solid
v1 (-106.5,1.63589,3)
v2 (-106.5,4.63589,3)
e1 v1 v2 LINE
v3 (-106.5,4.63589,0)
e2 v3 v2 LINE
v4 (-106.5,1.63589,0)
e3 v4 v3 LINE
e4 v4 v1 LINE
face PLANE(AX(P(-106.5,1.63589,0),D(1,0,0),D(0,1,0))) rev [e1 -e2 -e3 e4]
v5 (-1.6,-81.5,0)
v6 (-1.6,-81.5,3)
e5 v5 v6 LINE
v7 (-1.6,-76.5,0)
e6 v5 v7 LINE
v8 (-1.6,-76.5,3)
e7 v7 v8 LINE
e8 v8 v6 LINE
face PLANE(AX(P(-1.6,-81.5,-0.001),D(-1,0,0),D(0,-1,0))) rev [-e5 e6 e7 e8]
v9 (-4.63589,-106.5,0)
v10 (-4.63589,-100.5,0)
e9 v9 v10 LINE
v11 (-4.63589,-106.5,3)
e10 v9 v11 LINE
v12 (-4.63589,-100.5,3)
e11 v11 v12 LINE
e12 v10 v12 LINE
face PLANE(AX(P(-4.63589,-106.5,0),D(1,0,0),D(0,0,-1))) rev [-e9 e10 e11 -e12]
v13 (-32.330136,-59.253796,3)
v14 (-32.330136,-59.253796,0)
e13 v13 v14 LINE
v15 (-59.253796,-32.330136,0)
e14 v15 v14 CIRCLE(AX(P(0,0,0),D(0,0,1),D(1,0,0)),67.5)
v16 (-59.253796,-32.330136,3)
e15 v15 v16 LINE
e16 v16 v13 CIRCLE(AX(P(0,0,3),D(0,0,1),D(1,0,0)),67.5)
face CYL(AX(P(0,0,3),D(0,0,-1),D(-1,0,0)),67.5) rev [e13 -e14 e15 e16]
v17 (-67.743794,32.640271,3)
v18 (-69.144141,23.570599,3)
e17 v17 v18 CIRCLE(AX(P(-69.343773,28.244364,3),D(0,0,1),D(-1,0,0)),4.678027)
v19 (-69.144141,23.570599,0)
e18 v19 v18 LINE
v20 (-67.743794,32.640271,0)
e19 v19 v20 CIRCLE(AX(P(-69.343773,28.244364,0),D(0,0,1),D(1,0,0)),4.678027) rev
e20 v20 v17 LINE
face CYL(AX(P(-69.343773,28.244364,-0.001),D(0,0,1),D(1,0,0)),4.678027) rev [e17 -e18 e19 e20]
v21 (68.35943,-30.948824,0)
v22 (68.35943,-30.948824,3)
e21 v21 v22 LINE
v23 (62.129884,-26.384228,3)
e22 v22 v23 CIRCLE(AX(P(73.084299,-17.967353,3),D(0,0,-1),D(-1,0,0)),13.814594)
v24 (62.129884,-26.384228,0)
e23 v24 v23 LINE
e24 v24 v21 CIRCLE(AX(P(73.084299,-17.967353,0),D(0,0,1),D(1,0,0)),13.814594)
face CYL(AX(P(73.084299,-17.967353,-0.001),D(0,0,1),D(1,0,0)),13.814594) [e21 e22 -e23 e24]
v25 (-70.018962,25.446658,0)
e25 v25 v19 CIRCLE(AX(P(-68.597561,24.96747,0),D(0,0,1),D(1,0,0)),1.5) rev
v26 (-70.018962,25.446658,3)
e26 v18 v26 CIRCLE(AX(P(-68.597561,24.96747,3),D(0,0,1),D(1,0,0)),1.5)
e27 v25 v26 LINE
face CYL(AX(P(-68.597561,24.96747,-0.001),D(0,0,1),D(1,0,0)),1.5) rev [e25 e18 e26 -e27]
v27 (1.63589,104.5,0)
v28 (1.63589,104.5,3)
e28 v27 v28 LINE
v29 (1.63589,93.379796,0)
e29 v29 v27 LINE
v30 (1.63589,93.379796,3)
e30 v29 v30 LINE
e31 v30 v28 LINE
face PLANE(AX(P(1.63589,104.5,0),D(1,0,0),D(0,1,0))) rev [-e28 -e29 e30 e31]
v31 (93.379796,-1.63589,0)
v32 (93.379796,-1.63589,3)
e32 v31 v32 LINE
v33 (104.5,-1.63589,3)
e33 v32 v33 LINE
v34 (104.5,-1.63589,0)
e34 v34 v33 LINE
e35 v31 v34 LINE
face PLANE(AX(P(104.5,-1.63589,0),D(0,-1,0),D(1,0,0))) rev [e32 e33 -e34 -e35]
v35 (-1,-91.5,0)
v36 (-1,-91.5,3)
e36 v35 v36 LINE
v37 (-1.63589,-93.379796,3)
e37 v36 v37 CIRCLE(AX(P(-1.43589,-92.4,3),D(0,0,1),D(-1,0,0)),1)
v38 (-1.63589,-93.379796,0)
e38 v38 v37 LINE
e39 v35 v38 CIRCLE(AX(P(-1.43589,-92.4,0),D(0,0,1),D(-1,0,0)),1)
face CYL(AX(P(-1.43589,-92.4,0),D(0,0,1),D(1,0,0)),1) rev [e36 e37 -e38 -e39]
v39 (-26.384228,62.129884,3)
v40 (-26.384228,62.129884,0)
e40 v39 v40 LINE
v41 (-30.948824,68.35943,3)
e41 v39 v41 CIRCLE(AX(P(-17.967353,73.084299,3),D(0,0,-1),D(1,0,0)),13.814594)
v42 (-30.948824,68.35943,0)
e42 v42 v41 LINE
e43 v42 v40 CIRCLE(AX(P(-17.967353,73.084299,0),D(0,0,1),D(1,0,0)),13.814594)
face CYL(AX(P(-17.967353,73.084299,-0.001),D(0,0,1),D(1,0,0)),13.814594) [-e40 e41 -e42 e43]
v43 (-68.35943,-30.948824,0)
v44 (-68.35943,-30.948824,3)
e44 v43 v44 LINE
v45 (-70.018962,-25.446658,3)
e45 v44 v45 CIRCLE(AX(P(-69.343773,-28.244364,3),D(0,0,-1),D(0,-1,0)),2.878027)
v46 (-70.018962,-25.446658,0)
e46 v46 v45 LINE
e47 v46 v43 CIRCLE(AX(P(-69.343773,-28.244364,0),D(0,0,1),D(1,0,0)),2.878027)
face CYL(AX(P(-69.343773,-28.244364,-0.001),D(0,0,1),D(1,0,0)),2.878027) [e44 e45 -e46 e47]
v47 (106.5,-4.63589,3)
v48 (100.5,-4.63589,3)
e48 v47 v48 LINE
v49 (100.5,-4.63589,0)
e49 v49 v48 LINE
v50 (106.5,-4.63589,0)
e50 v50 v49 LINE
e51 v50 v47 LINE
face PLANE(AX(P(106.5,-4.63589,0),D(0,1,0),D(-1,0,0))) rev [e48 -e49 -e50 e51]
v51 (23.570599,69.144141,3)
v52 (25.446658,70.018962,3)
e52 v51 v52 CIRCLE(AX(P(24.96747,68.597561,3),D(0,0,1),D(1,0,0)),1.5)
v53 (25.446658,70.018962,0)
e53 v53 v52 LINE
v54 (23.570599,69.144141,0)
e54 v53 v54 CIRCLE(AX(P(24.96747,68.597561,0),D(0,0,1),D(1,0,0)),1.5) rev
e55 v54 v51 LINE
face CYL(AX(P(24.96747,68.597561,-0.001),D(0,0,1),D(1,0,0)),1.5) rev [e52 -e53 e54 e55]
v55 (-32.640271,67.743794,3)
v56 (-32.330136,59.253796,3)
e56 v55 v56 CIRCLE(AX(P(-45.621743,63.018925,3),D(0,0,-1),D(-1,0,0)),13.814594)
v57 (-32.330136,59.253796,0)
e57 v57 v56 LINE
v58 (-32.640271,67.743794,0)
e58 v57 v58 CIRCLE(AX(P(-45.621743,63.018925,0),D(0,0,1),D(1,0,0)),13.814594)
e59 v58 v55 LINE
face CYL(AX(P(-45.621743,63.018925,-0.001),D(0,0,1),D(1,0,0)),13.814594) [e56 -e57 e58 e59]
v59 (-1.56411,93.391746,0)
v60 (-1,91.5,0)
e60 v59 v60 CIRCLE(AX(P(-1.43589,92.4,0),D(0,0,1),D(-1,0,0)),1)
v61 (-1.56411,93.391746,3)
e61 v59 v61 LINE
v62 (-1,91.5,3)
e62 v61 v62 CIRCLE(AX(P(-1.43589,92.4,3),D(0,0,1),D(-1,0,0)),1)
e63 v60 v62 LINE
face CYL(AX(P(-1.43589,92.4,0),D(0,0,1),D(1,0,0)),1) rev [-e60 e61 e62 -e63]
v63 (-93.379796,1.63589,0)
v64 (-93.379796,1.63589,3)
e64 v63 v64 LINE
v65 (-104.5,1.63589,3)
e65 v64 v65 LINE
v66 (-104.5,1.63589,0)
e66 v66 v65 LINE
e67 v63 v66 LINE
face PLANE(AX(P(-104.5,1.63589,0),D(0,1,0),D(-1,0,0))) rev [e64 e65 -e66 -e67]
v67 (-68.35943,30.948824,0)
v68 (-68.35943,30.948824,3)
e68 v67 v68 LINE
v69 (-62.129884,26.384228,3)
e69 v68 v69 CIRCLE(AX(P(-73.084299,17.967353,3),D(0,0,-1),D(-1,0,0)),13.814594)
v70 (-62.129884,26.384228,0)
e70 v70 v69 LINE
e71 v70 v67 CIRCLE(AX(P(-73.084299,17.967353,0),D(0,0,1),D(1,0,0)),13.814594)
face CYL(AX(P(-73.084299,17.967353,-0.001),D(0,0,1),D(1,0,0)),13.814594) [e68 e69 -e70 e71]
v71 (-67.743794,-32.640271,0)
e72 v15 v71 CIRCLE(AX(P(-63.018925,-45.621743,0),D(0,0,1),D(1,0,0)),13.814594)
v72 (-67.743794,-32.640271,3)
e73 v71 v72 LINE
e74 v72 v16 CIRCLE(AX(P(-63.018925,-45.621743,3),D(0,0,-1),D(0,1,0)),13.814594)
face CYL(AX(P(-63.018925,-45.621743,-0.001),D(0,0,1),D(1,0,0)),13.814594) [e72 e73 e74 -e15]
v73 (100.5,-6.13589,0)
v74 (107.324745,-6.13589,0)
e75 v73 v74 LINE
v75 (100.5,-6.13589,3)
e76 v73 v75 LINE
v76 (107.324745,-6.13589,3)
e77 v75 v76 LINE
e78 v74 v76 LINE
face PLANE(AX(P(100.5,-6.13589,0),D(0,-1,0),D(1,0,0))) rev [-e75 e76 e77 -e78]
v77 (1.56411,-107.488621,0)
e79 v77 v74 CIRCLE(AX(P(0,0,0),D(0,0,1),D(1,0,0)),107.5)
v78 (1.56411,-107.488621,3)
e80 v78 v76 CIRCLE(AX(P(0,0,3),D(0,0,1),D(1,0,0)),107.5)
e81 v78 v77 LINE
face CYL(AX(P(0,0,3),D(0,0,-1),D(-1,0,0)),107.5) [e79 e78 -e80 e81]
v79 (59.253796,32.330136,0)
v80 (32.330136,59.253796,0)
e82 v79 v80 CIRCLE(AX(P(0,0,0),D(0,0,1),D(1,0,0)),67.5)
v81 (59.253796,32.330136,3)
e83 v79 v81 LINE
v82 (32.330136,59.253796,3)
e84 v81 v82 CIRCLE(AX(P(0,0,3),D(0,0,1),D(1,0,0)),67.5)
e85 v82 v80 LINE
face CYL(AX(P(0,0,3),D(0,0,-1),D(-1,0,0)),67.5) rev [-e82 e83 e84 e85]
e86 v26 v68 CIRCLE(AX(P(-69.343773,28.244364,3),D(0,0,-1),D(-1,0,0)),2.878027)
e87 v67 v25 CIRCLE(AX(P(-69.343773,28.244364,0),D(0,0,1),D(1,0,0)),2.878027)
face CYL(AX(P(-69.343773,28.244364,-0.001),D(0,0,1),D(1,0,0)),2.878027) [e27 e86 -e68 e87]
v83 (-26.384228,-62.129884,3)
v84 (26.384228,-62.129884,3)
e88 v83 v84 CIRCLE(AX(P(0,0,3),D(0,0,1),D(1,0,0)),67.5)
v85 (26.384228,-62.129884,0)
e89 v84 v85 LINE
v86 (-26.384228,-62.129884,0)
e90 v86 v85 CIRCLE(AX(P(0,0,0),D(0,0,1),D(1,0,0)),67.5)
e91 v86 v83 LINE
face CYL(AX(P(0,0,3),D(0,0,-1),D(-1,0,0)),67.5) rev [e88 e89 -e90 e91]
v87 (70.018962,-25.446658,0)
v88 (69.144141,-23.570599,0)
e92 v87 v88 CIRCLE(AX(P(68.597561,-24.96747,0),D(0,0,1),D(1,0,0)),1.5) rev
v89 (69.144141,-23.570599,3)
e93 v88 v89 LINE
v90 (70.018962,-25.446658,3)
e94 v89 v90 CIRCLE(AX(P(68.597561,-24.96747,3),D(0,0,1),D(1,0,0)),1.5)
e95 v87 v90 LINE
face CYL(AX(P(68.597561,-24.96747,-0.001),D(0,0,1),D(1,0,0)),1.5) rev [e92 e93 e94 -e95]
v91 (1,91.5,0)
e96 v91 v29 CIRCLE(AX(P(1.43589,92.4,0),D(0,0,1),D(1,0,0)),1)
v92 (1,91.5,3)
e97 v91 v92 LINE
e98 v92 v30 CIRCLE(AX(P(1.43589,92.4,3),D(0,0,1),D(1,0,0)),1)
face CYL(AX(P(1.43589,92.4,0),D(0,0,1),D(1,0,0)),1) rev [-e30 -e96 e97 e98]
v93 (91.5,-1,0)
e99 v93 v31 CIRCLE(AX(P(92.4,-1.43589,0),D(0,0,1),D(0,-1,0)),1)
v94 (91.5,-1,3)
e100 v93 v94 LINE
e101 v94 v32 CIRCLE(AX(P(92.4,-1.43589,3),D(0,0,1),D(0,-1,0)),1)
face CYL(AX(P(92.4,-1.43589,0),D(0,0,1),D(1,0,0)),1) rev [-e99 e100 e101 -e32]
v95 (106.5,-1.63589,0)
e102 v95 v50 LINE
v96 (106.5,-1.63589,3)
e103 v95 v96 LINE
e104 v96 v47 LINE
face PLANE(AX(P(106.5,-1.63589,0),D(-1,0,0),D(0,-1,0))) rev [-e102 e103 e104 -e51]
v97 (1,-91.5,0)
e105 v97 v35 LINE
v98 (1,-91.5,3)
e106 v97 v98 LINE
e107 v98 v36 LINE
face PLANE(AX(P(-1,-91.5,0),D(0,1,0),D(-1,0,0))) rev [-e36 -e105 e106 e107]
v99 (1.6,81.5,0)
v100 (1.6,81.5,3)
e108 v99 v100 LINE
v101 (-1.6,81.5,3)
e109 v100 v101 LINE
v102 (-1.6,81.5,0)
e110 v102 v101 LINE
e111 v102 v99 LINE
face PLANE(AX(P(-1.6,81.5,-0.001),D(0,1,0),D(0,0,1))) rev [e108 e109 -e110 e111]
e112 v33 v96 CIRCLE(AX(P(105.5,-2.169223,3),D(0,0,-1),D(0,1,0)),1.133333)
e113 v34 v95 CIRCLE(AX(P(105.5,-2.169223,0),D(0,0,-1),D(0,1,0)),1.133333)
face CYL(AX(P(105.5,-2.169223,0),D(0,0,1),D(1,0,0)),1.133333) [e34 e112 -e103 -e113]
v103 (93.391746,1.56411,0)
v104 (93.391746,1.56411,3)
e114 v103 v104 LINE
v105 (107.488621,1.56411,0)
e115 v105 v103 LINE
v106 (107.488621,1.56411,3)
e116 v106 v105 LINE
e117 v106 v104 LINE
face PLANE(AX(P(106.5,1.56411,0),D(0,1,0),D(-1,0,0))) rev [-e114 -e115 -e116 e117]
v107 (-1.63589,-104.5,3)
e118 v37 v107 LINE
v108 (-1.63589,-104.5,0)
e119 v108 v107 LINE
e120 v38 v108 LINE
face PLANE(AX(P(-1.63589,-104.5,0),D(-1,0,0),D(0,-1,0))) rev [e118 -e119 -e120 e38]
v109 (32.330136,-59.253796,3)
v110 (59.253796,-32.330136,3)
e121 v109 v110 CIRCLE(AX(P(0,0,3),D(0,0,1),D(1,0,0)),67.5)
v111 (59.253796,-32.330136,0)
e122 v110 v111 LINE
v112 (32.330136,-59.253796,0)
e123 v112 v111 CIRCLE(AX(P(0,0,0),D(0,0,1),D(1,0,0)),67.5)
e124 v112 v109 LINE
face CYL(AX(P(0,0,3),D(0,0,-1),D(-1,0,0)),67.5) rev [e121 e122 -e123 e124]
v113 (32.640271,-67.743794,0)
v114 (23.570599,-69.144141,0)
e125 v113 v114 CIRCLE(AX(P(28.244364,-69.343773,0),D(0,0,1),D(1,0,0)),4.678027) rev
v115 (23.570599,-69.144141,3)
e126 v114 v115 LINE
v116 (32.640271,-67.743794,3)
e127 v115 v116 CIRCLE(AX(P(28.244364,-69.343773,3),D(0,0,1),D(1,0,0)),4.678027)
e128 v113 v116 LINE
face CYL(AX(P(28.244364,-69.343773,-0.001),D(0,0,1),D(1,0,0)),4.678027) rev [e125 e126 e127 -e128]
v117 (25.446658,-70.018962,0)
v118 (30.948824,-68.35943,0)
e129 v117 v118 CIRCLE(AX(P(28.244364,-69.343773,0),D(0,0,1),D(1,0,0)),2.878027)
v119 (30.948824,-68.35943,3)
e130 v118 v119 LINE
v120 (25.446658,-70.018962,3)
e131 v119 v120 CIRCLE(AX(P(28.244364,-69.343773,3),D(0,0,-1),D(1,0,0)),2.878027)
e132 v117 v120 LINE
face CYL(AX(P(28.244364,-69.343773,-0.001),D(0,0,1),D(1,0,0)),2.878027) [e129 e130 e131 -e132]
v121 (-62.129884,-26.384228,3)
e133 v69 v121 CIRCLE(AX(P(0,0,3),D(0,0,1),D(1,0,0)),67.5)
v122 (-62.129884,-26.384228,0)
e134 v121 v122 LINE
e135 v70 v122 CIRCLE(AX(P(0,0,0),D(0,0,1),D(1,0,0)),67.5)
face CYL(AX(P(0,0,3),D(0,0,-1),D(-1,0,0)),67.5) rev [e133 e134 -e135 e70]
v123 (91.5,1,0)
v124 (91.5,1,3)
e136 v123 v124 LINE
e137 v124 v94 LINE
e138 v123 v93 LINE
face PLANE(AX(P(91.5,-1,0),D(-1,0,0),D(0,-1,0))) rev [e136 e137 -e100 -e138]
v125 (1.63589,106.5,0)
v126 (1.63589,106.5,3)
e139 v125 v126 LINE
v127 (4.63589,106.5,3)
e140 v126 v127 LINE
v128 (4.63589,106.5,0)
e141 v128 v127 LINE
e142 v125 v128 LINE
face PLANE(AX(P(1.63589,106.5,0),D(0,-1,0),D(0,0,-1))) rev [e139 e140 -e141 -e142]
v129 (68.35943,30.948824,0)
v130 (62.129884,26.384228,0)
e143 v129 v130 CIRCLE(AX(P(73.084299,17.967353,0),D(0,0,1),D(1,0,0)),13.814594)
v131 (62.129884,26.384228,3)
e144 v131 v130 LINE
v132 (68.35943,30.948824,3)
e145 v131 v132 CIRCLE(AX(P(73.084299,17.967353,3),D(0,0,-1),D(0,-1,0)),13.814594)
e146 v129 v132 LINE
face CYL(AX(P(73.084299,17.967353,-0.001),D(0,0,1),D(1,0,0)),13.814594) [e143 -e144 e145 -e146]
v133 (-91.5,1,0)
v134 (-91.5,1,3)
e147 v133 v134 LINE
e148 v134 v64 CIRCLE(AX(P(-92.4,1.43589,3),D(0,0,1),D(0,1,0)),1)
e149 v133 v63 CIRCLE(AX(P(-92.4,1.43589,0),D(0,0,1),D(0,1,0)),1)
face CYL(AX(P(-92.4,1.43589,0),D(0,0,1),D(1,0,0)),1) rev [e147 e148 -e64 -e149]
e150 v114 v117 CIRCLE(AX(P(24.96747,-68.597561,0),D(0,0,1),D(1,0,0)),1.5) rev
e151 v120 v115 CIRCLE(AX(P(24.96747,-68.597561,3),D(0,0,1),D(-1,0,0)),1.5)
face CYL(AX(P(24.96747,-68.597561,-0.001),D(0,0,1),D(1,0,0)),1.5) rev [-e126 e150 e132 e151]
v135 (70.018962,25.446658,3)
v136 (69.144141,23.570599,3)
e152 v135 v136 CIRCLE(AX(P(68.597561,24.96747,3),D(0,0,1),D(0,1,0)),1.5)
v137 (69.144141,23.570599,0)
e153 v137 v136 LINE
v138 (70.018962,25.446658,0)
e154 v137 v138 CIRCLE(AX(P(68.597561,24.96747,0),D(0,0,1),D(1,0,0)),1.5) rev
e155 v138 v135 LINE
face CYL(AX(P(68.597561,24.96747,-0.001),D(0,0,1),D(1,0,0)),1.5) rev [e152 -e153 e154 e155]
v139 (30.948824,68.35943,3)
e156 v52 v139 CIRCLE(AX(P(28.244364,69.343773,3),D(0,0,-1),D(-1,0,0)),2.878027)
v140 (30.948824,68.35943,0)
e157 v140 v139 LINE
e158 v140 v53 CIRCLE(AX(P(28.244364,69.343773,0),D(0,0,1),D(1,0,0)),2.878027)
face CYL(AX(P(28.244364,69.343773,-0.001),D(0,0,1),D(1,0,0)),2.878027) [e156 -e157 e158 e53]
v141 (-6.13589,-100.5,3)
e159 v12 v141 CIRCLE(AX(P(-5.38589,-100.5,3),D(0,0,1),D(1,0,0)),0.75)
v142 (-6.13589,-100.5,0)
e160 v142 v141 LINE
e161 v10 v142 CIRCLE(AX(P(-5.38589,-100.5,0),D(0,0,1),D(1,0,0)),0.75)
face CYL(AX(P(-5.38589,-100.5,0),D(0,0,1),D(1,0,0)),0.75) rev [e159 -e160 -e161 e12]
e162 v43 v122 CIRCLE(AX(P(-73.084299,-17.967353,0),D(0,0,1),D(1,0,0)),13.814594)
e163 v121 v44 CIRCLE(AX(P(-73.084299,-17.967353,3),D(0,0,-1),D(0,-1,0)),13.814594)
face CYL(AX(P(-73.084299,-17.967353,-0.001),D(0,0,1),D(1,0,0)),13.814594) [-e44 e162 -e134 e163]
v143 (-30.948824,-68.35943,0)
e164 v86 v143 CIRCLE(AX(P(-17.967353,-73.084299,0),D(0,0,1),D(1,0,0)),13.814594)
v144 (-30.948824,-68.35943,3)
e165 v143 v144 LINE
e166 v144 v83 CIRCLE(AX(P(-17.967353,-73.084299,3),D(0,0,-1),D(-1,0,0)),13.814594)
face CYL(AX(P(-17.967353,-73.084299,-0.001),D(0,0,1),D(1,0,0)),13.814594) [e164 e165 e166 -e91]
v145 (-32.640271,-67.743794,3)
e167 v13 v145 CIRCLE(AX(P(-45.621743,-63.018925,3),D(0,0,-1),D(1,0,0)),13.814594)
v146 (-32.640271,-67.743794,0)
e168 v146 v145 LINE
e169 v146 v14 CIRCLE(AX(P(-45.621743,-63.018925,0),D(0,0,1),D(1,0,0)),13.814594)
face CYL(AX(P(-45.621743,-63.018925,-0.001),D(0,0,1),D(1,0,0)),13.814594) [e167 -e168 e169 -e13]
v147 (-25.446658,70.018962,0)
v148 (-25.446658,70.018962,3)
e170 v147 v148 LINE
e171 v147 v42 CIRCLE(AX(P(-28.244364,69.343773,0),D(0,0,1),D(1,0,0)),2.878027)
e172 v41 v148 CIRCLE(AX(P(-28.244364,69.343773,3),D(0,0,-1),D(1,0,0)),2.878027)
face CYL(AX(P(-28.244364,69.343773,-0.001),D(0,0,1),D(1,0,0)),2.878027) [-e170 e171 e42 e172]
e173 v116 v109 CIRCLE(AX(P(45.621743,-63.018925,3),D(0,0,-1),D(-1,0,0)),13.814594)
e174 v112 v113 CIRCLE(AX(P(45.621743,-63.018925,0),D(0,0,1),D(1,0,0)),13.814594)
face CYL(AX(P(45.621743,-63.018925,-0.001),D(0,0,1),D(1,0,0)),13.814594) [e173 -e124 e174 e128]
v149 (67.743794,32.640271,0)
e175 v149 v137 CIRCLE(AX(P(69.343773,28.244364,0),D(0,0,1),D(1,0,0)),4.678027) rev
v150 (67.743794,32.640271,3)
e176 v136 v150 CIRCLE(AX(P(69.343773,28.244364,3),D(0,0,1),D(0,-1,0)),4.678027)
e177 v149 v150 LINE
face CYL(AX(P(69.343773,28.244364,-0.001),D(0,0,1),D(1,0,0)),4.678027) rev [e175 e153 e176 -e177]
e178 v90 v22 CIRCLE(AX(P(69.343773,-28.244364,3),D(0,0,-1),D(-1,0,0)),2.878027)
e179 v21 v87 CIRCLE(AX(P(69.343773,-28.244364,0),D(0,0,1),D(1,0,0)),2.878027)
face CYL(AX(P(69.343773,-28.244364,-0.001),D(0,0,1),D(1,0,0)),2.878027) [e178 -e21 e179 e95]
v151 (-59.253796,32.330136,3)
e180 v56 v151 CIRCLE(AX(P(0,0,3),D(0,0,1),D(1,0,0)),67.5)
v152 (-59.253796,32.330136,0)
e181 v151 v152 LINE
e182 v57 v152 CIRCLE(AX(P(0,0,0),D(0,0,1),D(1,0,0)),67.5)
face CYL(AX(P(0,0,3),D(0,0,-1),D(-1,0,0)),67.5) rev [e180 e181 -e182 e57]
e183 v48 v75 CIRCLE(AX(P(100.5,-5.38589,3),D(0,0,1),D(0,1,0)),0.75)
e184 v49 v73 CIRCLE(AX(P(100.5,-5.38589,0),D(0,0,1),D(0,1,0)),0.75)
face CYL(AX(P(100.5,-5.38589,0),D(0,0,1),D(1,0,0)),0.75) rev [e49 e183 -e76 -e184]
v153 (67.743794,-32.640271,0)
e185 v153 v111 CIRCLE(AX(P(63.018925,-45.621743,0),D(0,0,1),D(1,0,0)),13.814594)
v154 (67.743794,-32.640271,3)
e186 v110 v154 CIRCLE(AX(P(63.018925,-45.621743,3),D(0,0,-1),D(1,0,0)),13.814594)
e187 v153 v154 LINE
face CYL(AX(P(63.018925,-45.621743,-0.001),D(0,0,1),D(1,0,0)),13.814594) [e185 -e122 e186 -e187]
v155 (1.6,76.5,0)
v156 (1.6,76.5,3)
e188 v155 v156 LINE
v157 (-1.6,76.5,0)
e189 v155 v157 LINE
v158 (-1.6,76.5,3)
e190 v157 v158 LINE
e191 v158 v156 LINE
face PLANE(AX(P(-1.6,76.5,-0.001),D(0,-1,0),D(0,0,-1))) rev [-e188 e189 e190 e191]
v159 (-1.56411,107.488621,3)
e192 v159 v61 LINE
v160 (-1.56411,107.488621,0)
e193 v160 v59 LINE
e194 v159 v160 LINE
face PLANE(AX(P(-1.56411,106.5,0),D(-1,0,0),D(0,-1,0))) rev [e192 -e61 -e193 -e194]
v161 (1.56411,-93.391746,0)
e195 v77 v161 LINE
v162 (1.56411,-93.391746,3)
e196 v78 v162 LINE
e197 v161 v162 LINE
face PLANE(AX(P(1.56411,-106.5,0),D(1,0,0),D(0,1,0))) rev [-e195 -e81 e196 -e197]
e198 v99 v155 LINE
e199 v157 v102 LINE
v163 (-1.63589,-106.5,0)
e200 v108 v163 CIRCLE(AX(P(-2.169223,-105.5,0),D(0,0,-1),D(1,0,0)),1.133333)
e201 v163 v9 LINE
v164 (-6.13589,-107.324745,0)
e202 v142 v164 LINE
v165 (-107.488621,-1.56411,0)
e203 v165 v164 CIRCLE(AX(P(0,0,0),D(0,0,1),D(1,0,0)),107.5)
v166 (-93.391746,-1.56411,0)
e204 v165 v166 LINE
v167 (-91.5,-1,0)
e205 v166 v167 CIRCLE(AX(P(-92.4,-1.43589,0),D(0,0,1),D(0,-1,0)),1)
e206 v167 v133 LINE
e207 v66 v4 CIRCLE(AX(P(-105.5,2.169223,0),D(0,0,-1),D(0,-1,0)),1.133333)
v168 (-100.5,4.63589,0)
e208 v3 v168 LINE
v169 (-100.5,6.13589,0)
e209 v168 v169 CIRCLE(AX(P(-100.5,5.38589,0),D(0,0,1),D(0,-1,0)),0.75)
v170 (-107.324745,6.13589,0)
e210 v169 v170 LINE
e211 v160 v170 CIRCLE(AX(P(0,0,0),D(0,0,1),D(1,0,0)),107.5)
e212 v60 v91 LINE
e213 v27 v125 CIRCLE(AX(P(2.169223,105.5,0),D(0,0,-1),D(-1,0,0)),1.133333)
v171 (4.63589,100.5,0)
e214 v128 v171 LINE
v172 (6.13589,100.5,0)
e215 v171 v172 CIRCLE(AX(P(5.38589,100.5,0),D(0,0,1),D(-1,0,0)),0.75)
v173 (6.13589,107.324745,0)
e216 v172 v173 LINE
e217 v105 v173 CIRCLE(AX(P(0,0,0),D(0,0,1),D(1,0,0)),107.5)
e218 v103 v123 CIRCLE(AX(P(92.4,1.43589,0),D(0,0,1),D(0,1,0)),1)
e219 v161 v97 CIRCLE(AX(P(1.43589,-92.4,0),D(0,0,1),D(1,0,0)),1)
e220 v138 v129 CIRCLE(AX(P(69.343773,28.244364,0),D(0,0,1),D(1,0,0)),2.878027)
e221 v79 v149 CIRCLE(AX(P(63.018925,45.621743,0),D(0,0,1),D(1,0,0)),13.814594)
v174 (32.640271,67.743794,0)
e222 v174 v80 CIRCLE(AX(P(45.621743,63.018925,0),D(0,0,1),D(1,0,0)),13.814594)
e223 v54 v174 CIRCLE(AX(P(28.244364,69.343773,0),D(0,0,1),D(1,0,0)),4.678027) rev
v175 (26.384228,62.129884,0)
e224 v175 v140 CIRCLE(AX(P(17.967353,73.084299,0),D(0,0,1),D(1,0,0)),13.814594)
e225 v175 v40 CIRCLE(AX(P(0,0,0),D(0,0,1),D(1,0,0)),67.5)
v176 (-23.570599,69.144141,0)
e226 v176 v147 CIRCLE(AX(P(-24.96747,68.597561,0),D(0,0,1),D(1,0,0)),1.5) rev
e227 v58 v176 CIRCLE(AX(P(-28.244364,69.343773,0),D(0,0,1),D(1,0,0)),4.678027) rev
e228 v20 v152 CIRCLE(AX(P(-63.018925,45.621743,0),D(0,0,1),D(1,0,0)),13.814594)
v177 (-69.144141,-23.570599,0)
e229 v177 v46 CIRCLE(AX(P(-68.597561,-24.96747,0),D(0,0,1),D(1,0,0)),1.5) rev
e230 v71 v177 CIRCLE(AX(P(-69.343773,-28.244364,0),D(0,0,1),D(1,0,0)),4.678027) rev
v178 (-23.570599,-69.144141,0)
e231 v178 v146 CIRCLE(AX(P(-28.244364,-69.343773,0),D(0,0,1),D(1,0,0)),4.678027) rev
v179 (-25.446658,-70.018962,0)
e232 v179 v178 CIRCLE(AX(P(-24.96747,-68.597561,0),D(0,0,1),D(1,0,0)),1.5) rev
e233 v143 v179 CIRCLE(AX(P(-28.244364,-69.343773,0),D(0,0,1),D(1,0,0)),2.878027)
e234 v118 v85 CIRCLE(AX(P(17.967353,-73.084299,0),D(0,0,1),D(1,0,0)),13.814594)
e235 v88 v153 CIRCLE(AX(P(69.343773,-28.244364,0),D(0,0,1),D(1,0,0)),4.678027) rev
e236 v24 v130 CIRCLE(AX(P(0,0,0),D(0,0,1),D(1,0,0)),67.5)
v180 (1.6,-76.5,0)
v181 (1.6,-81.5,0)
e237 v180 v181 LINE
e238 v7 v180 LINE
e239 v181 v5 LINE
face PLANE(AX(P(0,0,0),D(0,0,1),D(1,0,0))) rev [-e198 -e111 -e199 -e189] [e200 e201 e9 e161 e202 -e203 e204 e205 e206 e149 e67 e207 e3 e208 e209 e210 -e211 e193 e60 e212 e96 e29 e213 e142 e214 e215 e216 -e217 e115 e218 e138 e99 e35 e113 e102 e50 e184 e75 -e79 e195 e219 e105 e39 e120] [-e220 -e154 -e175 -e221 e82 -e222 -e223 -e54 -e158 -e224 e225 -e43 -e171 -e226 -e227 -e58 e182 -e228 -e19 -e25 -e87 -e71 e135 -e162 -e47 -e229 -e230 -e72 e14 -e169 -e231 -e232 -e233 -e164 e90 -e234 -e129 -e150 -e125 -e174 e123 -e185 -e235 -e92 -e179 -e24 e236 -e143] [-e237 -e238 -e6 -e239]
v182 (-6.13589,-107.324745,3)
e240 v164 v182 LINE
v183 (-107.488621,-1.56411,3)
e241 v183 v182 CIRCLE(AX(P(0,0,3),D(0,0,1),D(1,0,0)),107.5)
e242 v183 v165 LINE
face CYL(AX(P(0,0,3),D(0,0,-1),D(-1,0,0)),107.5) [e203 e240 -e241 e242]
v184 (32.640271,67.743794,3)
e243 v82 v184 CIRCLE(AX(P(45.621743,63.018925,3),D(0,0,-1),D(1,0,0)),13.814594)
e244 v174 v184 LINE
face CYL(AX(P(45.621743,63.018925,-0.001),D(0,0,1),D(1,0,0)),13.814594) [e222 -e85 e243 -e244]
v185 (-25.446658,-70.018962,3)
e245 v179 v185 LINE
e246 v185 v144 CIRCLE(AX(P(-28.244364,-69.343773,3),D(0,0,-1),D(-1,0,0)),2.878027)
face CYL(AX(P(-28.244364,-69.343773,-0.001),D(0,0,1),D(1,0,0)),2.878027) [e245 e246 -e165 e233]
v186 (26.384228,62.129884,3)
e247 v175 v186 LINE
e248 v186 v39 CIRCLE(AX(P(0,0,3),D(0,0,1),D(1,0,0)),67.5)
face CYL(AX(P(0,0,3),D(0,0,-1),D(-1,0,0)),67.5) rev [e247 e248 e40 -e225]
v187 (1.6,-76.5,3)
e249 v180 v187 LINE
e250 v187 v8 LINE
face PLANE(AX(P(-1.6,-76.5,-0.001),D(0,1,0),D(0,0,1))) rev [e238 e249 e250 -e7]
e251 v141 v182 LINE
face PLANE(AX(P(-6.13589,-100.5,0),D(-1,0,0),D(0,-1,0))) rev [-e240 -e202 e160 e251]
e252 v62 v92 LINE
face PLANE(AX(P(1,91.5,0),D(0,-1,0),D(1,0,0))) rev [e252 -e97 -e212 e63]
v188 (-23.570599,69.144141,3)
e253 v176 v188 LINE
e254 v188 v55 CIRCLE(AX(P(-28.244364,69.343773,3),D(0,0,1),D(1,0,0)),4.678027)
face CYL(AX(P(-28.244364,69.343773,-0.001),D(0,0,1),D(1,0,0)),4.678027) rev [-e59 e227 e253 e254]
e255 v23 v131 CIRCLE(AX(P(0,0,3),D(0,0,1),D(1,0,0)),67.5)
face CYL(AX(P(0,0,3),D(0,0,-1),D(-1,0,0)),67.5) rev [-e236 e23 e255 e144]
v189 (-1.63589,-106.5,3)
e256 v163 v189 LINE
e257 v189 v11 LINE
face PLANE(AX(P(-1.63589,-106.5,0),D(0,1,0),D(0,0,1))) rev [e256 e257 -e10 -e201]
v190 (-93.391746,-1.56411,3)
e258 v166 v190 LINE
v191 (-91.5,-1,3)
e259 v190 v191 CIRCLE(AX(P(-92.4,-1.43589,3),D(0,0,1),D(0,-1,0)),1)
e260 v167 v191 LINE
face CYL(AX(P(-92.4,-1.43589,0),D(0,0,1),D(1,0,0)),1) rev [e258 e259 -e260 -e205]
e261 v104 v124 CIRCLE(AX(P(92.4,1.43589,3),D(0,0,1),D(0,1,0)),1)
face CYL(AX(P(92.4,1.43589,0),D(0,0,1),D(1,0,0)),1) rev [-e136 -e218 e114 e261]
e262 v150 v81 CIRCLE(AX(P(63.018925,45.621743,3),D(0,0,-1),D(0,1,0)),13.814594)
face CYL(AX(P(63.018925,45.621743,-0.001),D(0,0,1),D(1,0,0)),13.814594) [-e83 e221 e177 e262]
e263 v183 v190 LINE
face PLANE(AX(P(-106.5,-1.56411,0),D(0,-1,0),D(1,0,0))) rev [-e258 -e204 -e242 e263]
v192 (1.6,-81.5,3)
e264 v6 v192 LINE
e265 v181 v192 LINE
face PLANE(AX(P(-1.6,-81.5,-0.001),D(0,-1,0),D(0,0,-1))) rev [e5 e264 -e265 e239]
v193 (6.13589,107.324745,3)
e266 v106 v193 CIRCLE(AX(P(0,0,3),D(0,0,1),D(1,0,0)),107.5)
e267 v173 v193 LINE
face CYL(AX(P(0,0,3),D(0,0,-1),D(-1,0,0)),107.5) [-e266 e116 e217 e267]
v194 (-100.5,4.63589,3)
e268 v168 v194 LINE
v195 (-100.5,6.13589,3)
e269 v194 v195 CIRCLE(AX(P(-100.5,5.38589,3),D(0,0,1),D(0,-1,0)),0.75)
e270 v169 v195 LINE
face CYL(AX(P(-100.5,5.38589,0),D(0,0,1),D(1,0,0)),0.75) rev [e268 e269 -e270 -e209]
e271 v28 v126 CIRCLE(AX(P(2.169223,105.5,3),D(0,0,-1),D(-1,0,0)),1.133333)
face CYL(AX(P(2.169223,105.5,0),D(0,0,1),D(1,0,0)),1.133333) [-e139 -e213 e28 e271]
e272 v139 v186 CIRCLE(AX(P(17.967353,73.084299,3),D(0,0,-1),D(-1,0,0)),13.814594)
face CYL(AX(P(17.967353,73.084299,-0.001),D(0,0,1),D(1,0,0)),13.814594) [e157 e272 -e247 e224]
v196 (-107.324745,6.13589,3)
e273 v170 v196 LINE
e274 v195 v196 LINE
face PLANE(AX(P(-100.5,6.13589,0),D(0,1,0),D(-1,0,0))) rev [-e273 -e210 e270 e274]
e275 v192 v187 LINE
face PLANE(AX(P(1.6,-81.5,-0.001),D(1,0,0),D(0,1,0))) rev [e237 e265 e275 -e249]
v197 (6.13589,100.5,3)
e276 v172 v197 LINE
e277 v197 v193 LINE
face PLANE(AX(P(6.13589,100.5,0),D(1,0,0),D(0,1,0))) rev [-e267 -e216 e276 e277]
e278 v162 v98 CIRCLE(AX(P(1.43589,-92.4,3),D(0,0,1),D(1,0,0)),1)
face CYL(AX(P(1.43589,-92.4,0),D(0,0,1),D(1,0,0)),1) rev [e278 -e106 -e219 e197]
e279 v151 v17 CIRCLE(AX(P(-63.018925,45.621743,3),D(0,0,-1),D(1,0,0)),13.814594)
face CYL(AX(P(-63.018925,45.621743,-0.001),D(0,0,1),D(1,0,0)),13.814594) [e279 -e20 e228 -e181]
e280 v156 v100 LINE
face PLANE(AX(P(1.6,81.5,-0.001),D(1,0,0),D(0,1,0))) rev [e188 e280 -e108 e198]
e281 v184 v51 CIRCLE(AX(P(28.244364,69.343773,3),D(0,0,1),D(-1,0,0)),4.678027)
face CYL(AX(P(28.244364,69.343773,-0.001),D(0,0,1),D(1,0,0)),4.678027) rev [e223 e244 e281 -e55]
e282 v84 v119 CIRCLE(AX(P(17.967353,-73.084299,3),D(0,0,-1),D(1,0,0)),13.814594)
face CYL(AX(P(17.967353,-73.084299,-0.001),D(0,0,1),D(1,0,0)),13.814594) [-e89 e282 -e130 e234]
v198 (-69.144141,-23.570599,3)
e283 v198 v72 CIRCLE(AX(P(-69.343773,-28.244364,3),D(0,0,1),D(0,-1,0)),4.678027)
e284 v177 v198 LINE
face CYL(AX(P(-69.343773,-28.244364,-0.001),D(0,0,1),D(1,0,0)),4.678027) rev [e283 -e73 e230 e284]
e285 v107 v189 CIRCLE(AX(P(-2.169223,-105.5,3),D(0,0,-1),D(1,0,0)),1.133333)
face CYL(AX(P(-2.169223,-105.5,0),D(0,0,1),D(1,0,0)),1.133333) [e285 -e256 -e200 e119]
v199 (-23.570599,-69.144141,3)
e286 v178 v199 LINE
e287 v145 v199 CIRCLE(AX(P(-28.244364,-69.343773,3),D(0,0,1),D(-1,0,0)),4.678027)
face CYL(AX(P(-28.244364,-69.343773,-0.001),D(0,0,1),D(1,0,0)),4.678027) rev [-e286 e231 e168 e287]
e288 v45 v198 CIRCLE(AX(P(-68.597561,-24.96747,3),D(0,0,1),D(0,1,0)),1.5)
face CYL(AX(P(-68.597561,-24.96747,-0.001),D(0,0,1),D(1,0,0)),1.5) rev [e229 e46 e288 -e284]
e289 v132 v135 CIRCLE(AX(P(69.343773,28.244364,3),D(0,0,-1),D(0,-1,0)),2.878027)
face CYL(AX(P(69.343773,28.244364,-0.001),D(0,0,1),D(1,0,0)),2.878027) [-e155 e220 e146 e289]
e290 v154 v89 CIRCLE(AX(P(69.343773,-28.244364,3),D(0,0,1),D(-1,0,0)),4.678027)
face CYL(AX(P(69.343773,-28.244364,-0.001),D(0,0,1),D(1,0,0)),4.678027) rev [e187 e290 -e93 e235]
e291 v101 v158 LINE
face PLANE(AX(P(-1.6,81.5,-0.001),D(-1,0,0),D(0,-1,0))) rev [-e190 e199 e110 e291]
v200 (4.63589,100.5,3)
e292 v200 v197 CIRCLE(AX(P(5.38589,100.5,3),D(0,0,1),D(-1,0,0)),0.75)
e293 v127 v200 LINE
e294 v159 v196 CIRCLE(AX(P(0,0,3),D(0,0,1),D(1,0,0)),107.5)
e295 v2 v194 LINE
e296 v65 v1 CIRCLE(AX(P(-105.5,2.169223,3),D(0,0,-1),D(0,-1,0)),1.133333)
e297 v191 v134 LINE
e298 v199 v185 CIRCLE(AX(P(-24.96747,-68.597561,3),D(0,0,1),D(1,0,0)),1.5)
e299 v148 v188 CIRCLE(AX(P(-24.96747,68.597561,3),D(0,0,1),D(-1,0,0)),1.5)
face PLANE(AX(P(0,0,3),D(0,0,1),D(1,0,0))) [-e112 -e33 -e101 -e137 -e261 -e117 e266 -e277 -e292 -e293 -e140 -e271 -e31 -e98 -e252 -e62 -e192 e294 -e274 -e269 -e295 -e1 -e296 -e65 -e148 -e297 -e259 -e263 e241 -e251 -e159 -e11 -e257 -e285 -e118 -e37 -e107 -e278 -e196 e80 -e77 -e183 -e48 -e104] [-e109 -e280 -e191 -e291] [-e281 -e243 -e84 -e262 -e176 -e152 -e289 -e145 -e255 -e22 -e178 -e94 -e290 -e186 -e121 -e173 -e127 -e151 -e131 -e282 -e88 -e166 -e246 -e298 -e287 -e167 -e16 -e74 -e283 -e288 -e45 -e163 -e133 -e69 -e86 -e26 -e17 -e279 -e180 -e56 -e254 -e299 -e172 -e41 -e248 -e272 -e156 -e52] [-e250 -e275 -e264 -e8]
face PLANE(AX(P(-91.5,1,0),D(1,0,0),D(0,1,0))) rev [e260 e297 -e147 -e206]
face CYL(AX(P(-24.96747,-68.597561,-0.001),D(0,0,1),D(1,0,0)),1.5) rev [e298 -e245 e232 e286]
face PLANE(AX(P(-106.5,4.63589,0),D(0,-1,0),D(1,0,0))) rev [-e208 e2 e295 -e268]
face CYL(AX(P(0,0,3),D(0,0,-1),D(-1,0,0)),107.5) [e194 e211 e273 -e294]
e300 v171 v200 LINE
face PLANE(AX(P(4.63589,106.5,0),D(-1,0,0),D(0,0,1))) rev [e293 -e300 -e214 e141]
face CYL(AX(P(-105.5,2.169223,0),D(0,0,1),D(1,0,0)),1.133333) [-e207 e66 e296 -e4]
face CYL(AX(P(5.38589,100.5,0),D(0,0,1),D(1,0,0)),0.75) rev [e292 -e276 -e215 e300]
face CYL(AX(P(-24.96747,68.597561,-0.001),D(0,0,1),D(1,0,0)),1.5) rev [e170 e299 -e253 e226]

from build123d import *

# Parameters (mm, degrees)
SKETCH1_R                          = 107.5
SKETCH1_R_2                        = 67.5
BOSS_EXTRUDE1_DEPTH                = 3
RIB_SLOT_DEPTH                     = 3
RIB_SLOT_PATTERN_COUNT             = 4
FRONT_BACK_RIB_TAB_CLEARANCE_REACH = 154.041
SKETCH3_W                          = 3.2
SKETCH3_H                          = 5
ELASTIC_ANCHORS_REACH              = 154.041


# Read off the part's stored shape, not the designer's step: rib slot
with BuildPart() as part:
    # Sketch1 → Boss-Extrude1 (new body)
    with BuildSketch(Plane.XY):
        Circle(SKETCH1_R)
        Circle(SKETCH1_R_2, mode=Mode.SUBTRACT)
    extrude(amount=BOSS_EXTRUDE1_DEPTH)

    # rib slot outline → rib slot (cut)
    with BuildSketch(Plane.XY):
        with BuildLine():
            ThreePointArc((-6.135889894, -107.324744841), (-2.287357957, -107.475662331), (1.564110106, -107.488620605))
            Line((1.564110106, -107.488620605), (1.564110106, -93.391745722))
            ThreePointArc((1.564110106, -93.391745722), (2.394190801, -92.114238959), (1, -91.5))
            Line((1, -91.5), (-1, -91.5))
            ThreePointArc((-1, -91.5), (-2.383159214, -92.079561495), (-1.635889894, -93.379795897))
            Line((-1.635889894, -93.379795897), (-1.635889894, -104.5))
            ThreePointArc((-1.635889894, -104.5), (-1.035889894, -105.5), (-1.635889894, -106.5))
            Line((-1.635889894, -106.5), (-4.635889894, -106.5))
            Line((-4.635889894, -106.5), (-4.635889894, -100.5))
            ThreePointArc((-4.635889894, -100.5), (-5.385889894, -99.75), (-6.135889894, -100.5))
            Line((-6.135889894, -100.5), (-6.135889894, -107.324744841))
        make_face()
    rib_slot = extrude(amount=RIB_SLOT_DEPTH, mode=Mode.SUBTRACT)

    # rib slot pattern: rib slot ×4 about axis
    rib_slot_pattern_axis = Axis((0, 0, 0), (0, 0, 1))
    for i in range(1, RIB_SLOT_PATTERN_COUNT):
        add(rib_slot.rotate(rib_slot_pattern_axis, i * 360 / RIB_SLOT_PATTERN_COUNT), mode=Mode.SUBTRACT)

    # Sketch3 → front back rib tab clearance (cut, up to next)
    with BuildSketch(Plane.XY.offset(3), mode=Mode.PRIVATE) as front_back_rib_tab_clearance_sk1:
        with Locations((0, -79)):
            Rectangle(SKETCH3_W, SKETCH3_H)
    front_back_rib_tab_clearance_tool1 = extrude(front_back_rib_tab_clearance_sk1.sketch, amount=-FRONT_BACK_RIB_TAB_CLEARANCE_REACH, mode=Mode.PRIVATE) & part.part
    # Sketch3 → front back rib tab clearance (cut, up to next)
    with BuildSketch(Plane.XY.offset(3), mode=Mode.PRIVATE) as front_back_rib_tab_clearance_sk2:
        with Locations((0, 79)):
            Rectangle(SKETCH3_W, SKETCH3_H)
    front_back_rib_tab_clearance_tool2 = extrude(front_back_rib_tab_clearance_sk2.sketch, amount=-FRONT_BACK_RIB_TAB_CLEARANCE_REACH, mode=Mode.PRIVATE) & part.part
    add(front_back_rib_tab_clearance_tool1.solids().sort_by_distance((0, -79, 3))[0], mode=Mode.SUBTRACT)
    add(front_back_rib_tab_clearance_tool2.solids().sort_by_distance((0, 79, 3))[0], mode=Mode.SUBTRACT)

    # Sketch4 → elastic anchors (cut, up to next)
    with BuildSketch(Plane.XY.offset(3), mode=Mode.PRIVATE) as elastic_anchors_sk1:
        with BuildLine():
            ThreePointArc((-23.570598706, -69.144140951), (-25.601397855, -67.238099637), (-25.446658029, -70.01896178))
            ThreePointArc((-25.446658029, -70.01896178), (-29.075438543, -72.099195538), (-30.948824345, -68.359430018))
            ThreePointArc((-30.948824345, -68.359430018), (-29.143124399, -64.96363906), (-26.471207488, -62.197268051))
            ThreePointArc((-26.471207488, -62.197268051), (-21.930237539, -59.850307494), (-16.846702438, -59.315234774))
            Line((-16.846702438, -59.315234774), (-37.629626544, -51.750869019))
            ThreePointArc((-37.629626544, -51.750869019), (-34.079350843, -55.428391879), (-32.109363213, -60.145147191))
            ThreePointArc((-32.109363213, -60.145147191), (-31.84074512, -63.981785414), (-32.640271063, -67.74379376))
            ThreePointArc((-32.640271063, -67.74379376), (-28.95818762, -73.967017614), (-23.570598706, -69.144140951))
        make_face()
    elastic_anchors_tool1 = extrude(elastic_anchors_sk1.sketch, amount=-ELASTIC_ANCHORS_REACH, mode=Mode.PRIVATE) & part.part
    # Sketch4 → elastic anchors (cut, up to next)
    with BuildSketch(Plane.XY.offset(3), mode=Mode.PRIVATE) as elastic_anchors_sk2:
        with BuildLine():
            ThreePointArc((23.570598706, -69.144140951), (25.601397855, -67.238099637), (25.446658029, -70.01896178))
            ThreePointArc((25.446658029, -70.01896178), (29.075438543, -72.099195538), (30.948824345, -68.359430018))
            ThreePointArc((30.948824345, -68.359430018), (29.143124399, -64.96363906), (26.471207488, -62.197268051))
            ThreePointArc((26.471207488, -62.197268051), (21.930237539, -59.850307494), (16.846702438, -59.315234774))
            Line((16.846702438, -59.315234774), (37.629626544, -51.750869019))
            ThreePointArc((37.629626544, -51.750869019), (34.079350843, -55.428391879), (32.109363213, -60.145147191))
            ThreePointArc((32.109363213, -60.145147191), (31.84074512, -63.981785414), (32.640271063, -67.74379376))
            ThreePointArc((32.640271063, -67.74379376), (28.95818762, -73.967017614), (23.570598706, -69.144140951))
        make_face()
    elastic_anchors_tool2 = extrude(elastic_anchors_sk2.sketch, amount=-ELASTIC_ANCHORS_REACH, mode=Mode.PRIVATE) & part.part
    # Sketch4 → elastic anchors (cut, up to next)
    with BuildSketch(Plane.XY.offset(3), mode=Mode.PRIVATE) as elastic_anchors_sk3:
        with BuildLine():
            ThreePointArc((-69.144140951, 23.570598706), (-67.238099637, 25.601397855), (-70.01896178, 25.446658029))
            ThreePointArc((-70.01896178, 25.446658029), (-72.099195538, 29.075438543), (-68.359430018, 30.948824345))
            ThreePointArc((-68.359430018, 30.948824345), (-64.96363906, 29.143124399), (-62.197268051, 26.471207488))
            ThreePointArc((-62.197268051, 26.471207488), (-59.850307494, 21.930237539), (-59.315234774, 16.846702438))
            Line((-59.315234774, 16.846702438), (-51.750869019, 37.629626544))
            ThreePointArc((-51.750869019, 37.629626544), (-55.428391879, 34.079350843), (-60.145147191, 32.109363213))
            ThreePointArc((-60.145147191, 32.109363213), (-63.981785414, 31.84074512), (-67.74379376, 32.640271063))
            ThreePointArc((-67.74379376, 32.640271063), (-73.967017614, 28.95818762), (-69.144140951, 23.570598706))
        make_face()
    elastic_anchors_tool3 = extrude(elastic_anchors_sk3.sketch, amount=-ELASTIC_ANCHORS_REACH, mode=Mode.PRIVATE) & part.part
    # Sketch4 → elastic anchors (cut, up to next)
    with BuildSketch(Plane.XY.offset(3), mode=Mode.PRIVATE) as elastic_anchors_sk4:
        with BuildLine():
            ThreePointArc((-69.144140951, -23.570598706), (-67.238099637, -25.601397855), (-70.01896178, -25.446658029))
            ThreePointArc((-70.01896178, -25.446658029), (-72.099195538, -29.075438543), (-68.359430018, -30.948824345))
            ThreePointArc((-68.359430018, -30.948824345), (-64.96363906, -29.143124399), (-62.197268051, -26.471207488))
            ThreePointArc((-62.197268051, -26.471207488), (-59.850307494, -21.930237539), (-59.315234774, -16.846702438))
            Line((-59.315234774, -16.846702438), (-51.750869019, -37.629626544))
            ThreePointArc((-51.750869019, -37.629626544), (-55.428391879, -34.079350843), (-60.145147191, -32.109363213))
            ThreePointArc((-60.145147191, -32.109363213), (-63.981785414, -31.84074512), (-67.74379376, -32.640271063))
            ThreePointArc((-67.74379376, -32.640271063), (-73.967017614, -28.95818762), (-69.144140951, -23.570598706))
        make_face()
    elastic_anchors_tool4 = extrude(elastic_anchors_sk4.sketch, amount=-ELASTIC_ANCHORS_REACH, mode=Mode.PRIVATE) & part.part
    # Sketch4 → elastic anchors (cut, up to next)
    with BuildSketch(Plane.XY.offset(3), mode=Mode.PRIVATE) as elastic_anchors_sk5:
        with BuildLine():
            ThreePointArc((23.570598706, 69.144140951), (25.601397855, 67.238099637), (25.446658029, 70.01896178))
            ThreePointArc((25.446658029, 70.01896178), (29.075438543, 72.099195538), (30.948824345, 68.359430018))
            ThreePointArc((30.948824345, 68.359430018), (29.143124399, 64.96363906), (26.471207488, 62.197268051))
            ThreePointArc((26.471207488, 62.197268051), (21.930237539, 59.850307494), (16.846702438, 59.315234774))
            Line((16.846702438, 59.315234774), (37.629626544, 51.750869019))
            ThreePointArc((37.629626544, 51.750869019), (34.079350843, 55.428391879), (32.109363213, 60.145147191))
            ThreePointArc((32.109363213, 60.145147191), (31.84074512, 63.981785414), (32.640271063, 67.74379376))
            ThreePointArc((32.640271063, 67.74379376), (28.95818762, 73.967017614), (23.570598706, 69.144140951))
        make_face()
    elastic_anchors_tool5 = extrude(elastic_anchors_sk5.sketch, amount=-ELASTIC_ANCHORS_REACH, mode=Mode.PRIVATE) & part.part
    # Sketch4 → elastic anchors (cut, up to next)
    with BuildSketch(Plane.XY.offset(3), mode=Mode.PRIVATE) as elastic_anchors_sk6:
        with BuildLine():
            ThreePointArc((-23.570598706, 69.144140951), (-25.601397855, 67.238099637), (-25.446658029, 70.01896178))
            ThreePointArc((-25.446658029, 70.01896178), (-29.075438543, 72.099195538), (-30.948824345, 68.359430018))
            ThreePointArc((-30.948824345, 68.359430018), (-29.143124399, 64.96363906), (-26.471207488, 62.197268051))
            ThreePointArc((-26.471207488, 62.197268051), (-21.930237539, 59.850307494), (-16.846702438, 59.315234774))
            Line((-16.846702438, 59.315234774), (-37.629626544, 51.750869019))
            ThreePointArc((-37.629626544, 51.750869019), (-34.079350843, 55.428391879), (-32.109363213, 60.145147191))
            ThreePointArc((-32.109363213, 60.145147191), (-31.84074512, 63.981785414), (-32.640271063, 67.74379376))
            ThreePointArc((-32.640271063, 67.74379376), (-28.95818762, 73.967017614), (-23.570598706, 69.144140951))
        make_face()
    elastic_anchors_tool6 = extrude(elastic_anchors_sk6.sketch, amount=-ELASTIC_ANCHORS_REACH, mode=Mode.PRIVATE) & part.part
    # Sketch4 → elastic anchors (cut, up to next)
    with BuildSketch(Plane.XY.offset(3), mode=Mode.PRIVATE) as elastic_anchors_sk7:
        with BuildLine():
            ThreePointArc((69.144140951, -23.570598706), (67.238099637, -25.601397855), (70.01896178, -25.446658029))
            ThreePointArc((70.01896178, -25.446658029), (72.099195538, -29.075438543), (68.359430018, -30.948824345))
            ThreePointArc((68.359430018, -30.948824345), (64.96363906, -29.143124399), (62.197268051, -26.471207488))
            ThreePointArc((62.197268051, -26.471207488), (59.850307494, -21.930237539), (59.315234774, -16.846702438))
            Line((59.315234774, -16.846702438), (51.750869019, -37.629626544))
            ThreePointArc((51.750869019, -37.629626544), (55.428391879, -34.079350843), (60.145147191, -32.109363213))
            ThreePointArc((60.145147191, -32.109363213), (63.981785414, -31.84074512), (67.74379376, -32.640271063))
            ThreePointArc((67.74379376, -32.640271063), (73.967017614, -28.95818762), (69.144140951, -23.570598706))
        make_face()
    elastic_anchors_tool7 = extrude(elastic_anchors_sk7.sketch, amount=-ELASTIC_ANCHORS_REACH, mode=Mode.PRIVATE) & part.part
    # Sketch4 → elastic anchors (cut, up to next)
    with BuildSketch(Plane.XY.offset(3), mode=Mode.PRIVATE) as elastic_anchors_sk8:
        with BuildLine():
            ThreePointArc((69.144140951, 23.570598706), (67.238099637, 25.601397855), (70.01896178, 25.446658029))
            ThreePointArc((70.01896178, 25.446658029), (72.099195538, 29.075438543), (68.359430018, 30.948824345))
            ThreePointArc((68.359430018, 30.948824345), (64.96363906, 29.143124399), (62.197268051, 26.471207488))
            ThreePointArc((62.197268051, 26.471207488), (59.850307494, 21.930237539), (59.315234774, 16.846702438))
            Line((59.315234774, 16.846702438), (51.750869019, 37.629626544))
            ThreePointArc((51.750869019, 37.629626544), (55.428391879, 34.079350843), (60.145147191, 32.109363213))
            ThreePointArc((60.145147191, 32.109363213), (63.981785414, 31.84074512), (67.74379376, 32.640271063))
            ThreePointArc((67.74379376, 32.640271063), (73.967017614, 28.95818762), (69.144140951, 23.570598706))
        make_face()
    elastic_anchors_tool8 = extrude(elastic_anchors_sk8.sketch, amount=-ELASTIC_ANCHORS_REACH, mode=Mode.PRIVATE) & part.part
    add(elastic_anchors_tool1.solids().sort_by_distance((-28.423672, -62.033014, 3))[0], mode=Mode.SUBTRACT)
    add(elastic_anchors_tool2.solids().sort_by_distance((28.423672, -62.033014, 3))[0], mode=Mode.SUBTRACT)
    add(elastic_anchors_tool3.solids().sort_by_distance((-62.033014, 28.423672, 3))[0], mode=Mode.SUBTRACT)
    add(elastic_anchors_tool4.solids().sort_by_distance((-62.033014, -28.423672, 3))[0], mode=Mode.SUBTRACT)
    add(elastic_anchors_tool5.solids().sort_by_distance((28.423672, 62.033014, 3))[0], mode=Mode.SUBTRACT)
    add(elastic_anchors_tool6.solids().sort_by_distance((-28.423672, 62.033014, 3))[0], mode=Mode.SUBTRACT)
    add(elastic_anchors_tool7.solids().sort_by_distance((62.033014, -28.423672, 3))[0], mode=Mode.SUBTRACT)
    add(elastic_anchors_tool8.solids().sort_by_distance((62.033014, 28.423672, 3))[0], mode=Mode.SUBTRACT)


solid = part.part
